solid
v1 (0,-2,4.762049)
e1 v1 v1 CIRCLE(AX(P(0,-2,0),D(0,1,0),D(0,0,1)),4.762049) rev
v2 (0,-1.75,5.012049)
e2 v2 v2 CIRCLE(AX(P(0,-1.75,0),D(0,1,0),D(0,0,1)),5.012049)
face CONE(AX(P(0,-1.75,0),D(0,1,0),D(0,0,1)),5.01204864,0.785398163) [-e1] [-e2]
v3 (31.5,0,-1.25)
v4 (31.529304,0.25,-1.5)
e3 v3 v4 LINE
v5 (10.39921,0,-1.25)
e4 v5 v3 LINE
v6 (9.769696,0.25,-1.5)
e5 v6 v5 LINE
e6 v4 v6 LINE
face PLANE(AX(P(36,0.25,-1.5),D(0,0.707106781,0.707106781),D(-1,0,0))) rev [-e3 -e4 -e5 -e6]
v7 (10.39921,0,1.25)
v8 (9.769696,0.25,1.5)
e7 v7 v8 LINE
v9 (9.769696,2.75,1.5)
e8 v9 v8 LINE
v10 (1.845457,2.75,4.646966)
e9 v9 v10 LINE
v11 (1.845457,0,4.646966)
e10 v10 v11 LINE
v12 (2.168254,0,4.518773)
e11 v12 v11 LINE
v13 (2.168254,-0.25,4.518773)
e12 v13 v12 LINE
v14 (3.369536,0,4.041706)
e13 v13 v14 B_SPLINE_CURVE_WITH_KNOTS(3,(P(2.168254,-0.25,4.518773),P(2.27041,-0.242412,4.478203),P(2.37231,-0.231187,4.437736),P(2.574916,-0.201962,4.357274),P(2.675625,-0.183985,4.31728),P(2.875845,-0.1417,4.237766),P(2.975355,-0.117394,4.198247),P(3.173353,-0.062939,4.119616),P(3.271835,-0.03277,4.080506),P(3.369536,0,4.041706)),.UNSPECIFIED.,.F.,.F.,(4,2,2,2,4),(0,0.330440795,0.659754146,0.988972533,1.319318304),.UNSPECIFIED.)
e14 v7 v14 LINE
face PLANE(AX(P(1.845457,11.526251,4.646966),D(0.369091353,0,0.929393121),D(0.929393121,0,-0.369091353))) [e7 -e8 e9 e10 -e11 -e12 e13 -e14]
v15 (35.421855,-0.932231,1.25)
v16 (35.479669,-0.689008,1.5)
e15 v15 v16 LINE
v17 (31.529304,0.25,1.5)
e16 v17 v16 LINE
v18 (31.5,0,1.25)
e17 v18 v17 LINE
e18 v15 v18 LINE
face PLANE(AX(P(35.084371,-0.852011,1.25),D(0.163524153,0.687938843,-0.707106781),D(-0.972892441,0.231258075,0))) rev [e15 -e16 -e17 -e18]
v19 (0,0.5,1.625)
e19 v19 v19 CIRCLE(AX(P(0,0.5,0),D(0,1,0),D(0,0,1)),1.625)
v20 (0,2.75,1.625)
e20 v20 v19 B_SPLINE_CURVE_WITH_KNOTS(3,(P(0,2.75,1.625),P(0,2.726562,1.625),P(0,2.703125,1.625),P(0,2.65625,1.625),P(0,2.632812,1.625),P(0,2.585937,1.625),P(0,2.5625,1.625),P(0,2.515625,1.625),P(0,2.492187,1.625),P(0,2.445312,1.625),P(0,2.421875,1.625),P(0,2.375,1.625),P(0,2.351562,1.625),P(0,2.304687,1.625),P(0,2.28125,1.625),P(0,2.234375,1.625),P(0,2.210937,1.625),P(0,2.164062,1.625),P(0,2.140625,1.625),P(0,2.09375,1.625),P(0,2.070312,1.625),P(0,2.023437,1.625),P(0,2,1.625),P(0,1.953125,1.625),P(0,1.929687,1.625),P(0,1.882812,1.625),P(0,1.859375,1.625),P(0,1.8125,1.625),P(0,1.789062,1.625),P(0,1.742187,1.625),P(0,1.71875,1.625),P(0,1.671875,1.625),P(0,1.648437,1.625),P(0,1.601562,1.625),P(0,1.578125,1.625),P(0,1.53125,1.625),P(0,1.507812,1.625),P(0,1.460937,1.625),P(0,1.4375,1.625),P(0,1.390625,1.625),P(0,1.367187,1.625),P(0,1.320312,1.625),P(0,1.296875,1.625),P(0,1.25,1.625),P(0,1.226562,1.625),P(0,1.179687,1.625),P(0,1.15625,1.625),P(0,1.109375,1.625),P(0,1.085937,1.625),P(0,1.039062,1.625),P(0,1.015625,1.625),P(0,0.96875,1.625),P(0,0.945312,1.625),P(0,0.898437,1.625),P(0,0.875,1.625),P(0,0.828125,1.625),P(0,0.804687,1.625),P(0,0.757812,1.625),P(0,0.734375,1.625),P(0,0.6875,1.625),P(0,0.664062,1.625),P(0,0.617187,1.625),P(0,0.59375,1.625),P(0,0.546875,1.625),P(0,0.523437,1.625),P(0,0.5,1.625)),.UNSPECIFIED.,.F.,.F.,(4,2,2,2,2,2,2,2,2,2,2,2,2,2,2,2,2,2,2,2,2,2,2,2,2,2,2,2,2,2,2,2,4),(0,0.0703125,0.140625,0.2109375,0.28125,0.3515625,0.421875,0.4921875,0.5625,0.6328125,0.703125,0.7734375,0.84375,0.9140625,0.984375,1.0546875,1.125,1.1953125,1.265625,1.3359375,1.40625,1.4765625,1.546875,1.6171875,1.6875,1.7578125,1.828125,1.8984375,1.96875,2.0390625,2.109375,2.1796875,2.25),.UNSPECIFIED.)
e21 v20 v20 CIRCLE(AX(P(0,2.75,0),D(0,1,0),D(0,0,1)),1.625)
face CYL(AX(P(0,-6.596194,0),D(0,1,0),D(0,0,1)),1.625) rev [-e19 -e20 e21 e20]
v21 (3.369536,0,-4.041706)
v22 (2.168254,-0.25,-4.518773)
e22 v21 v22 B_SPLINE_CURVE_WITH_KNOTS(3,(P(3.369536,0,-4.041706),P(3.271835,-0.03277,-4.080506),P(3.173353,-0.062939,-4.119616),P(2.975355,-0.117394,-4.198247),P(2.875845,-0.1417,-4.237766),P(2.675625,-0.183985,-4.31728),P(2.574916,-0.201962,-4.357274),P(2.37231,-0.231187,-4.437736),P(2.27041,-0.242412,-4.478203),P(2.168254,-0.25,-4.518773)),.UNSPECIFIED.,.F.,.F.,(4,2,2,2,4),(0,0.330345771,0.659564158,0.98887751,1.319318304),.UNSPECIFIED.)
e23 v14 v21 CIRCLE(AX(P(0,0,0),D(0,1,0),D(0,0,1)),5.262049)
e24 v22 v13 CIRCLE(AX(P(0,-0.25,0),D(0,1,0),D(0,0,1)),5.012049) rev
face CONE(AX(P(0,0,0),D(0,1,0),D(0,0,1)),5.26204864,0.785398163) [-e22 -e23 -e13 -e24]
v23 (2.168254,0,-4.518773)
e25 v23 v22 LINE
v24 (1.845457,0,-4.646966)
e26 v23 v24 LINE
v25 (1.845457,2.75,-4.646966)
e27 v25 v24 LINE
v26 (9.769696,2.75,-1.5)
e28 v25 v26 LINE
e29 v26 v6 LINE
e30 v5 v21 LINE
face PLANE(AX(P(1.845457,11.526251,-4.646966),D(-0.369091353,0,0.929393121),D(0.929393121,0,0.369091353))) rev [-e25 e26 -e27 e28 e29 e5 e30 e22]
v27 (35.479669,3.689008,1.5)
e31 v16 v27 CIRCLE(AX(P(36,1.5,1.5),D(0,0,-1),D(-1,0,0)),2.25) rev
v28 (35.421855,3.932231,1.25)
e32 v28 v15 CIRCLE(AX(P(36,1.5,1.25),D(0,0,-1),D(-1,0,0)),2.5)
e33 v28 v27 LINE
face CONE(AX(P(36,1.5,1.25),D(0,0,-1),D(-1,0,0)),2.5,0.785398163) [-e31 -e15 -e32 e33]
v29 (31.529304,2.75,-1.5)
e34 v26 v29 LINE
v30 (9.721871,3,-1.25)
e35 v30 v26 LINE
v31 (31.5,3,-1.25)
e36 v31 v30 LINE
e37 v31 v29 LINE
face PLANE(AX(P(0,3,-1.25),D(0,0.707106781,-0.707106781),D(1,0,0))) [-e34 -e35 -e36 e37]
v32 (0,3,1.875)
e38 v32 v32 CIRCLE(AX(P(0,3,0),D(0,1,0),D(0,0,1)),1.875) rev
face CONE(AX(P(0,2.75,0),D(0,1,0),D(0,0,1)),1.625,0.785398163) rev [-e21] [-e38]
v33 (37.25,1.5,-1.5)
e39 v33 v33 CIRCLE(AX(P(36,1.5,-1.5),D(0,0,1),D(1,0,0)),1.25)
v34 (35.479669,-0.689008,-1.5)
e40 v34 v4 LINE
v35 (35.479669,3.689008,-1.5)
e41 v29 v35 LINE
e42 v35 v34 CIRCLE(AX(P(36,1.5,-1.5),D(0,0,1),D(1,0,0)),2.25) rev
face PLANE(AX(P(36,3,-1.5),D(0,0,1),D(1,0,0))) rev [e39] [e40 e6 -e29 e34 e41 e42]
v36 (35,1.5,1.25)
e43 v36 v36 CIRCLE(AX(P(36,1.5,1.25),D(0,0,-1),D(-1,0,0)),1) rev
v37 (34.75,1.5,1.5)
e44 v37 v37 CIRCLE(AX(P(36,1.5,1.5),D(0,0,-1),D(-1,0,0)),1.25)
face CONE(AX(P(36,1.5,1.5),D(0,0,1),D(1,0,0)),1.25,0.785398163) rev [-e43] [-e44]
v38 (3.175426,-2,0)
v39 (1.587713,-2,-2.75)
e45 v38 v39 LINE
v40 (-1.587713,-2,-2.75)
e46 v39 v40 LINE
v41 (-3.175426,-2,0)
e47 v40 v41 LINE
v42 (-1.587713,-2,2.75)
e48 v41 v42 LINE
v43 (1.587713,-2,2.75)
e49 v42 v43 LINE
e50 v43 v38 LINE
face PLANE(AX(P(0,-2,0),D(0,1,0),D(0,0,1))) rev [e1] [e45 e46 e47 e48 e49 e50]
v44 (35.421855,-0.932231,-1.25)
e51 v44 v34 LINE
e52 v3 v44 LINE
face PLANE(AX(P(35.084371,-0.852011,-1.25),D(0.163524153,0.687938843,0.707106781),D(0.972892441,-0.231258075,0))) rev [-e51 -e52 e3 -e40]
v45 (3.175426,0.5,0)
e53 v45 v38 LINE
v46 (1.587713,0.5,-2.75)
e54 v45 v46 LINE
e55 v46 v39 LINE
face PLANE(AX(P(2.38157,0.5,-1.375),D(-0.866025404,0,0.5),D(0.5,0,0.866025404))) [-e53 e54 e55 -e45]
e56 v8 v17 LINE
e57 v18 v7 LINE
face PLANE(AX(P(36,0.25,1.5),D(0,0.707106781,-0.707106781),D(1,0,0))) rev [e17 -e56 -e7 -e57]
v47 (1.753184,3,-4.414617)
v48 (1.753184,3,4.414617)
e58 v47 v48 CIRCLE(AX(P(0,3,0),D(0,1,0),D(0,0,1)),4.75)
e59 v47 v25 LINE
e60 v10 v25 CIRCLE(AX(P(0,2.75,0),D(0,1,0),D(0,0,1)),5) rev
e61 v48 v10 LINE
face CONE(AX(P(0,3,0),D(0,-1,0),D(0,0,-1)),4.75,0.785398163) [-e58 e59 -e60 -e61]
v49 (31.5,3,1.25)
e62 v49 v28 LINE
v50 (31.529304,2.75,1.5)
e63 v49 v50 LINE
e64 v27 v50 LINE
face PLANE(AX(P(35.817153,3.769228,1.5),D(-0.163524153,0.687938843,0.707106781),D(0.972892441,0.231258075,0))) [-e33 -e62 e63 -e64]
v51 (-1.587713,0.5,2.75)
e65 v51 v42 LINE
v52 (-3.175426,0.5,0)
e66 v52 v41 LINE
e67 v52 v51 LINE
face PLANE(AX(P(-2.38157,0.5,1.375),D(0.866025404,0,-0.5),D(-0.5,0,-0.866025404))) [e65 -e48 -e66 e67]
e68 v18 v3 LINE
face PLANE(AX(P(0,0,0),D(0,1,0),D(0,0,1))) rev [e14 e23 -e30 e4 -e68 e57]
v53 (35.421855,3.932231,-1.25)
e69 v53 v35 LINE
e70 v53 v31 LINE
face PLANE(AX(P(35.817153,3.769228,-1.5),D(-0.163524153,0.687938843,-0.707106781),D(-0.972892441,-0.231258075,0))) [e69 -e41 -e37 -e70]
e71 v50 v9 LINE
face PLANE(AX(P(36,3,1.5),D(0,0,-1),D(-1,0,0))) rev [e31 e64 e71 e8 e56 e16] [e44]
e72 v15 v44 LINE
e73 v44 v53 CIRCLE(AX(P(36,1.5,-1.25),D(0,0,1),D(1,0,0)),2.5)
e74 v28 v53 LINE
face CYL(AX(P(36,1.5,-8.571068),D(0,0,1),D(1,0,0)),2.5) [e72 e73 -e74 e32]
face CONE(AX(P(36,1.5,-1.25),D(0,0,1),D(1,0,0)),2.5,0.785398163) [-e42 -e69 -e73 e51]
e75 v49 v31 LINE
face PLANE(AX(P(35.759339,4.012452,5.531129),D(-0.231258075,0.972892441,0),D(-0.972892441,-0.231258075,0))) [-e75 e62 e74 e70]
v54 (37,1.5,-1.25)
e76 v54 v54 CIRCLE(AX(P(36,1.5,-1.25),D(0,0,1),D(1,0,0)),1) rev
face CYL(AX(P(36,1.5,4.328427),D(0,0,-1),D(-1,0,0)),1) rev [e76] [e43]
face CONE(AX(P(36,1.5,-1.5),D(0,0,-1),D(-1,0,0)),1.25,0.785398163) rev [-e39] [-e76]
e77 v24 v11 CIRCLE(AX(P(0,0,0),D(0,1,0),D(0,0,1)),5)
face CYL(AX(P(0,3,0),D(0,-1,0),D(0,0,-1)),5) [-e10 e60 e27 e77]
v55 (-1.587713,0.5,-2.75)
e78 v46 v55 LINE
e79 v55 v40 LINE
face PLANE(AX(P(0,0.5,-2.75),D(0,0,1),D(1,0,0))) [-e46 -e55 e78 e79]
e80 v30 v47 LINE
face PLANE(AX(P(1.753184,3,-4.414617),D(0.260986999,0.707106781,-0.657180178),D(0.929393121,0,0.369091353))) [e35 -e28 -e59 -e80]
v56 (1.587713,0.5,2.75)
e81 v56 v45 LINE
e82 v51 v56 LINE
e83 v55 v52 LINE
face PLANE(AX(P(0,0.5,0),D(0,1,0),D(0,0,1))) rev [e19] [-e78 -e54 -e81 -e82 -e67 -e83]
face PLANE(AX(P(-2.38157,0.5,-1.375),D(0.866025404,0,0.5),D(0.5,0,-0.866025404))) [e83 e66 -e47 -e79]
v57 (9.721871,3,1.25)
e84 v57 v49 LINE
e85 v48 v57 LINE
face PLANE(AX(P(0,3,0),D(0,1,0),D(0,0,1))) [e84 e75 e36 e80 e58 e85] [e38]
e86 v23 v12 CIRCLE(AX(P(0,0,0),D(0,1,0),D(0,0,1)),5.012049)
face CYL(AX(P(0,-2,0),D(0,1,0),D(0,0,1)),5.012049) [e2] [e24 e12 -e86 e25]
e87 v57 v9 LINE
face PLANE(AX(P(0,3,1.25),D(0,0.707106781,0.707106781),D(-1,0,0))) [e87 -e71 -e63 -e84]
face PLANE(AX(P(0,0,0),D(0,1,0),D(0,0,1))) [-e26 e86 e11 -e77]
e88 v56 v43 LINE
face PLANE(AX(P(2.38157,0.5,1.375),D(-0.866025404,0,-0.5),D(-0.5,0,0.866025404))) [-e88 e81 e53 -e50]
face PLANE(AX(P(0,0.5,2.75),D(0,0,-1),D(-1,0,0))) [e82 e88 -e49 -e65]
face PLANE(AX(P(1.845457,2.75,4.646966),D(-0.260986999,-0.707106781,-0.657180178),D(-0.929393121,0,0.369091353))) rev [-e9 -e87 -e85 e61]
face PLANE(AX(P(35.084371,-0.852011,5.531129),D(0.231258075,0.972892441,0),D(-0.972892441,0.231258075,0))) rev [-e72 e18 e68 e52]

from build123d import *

# Parameters (mm, degrees)
EXTRUDE_1_DEPTH     = 3
EXTRUDE_START       = 1.5
SKETCH_2_R          = 2.5
EXTRUDE_2_DEPTH     = 3
CUT_EXTRUDE_START   = -1.5
SKETCH_3_R          = 1
CUT_EXTRUDE_1_DEPTH = 3
EXTRUDE_3_DEPTH     = 3
EXTRUDE_4_DEPTH     = 3
SKETCH_7_R          = 5.01204864
EXTRUDE_5_DEPTH     = 2
CUT_EXTRUDE_START_2 = -2
CUT_EXTRUDE_2_DEPTH = 2.5
CUT_EXTRUDE_START_3 = 3
SKETCH_9_R          = 1.625
CUT_EXTRUDE_3_DEPTH = 5
CHAMFER_3_SIZE      = 0.25


with BuildPart() as part:
    # 草图1 → 凸台-拉伸1 (new body)
    with BuildSketch(Plane(origin=(0, 0, 0), x_dir=(1, 0, 0), z_dir=(0, 1, 0))):
        with BuildLine():
            Line((36, -1.5), (36, 1.5))
            Line((36, 1.5), (4.769696007, 1.5))
            ThreePointArc((4.769696007, 1.5), (-5, 0), (4.769696007, -1.5))
            Line((4.769696007, -1.5), (36, -1.5))
        make_face()
    extrude(amount=EXTRUDE_1_DEPTH)

    # 草图2 → 凸台-拉伸2 (add)
    with BuildSketch(Plane.XY.offset(EXTRUDE_START)):
        with Locations((36, 1.5)):
            Circle(SKETCH_2_R)
    extrude(amount=-EXTRUDE_2_DEPTH)

    # 草图3 → 切除-拉伸1 (cut)
    with BuildSketch(Plane.XY.offset(CUT_EXTRUDE_START)):
        with Locations(Location((36, 1.5, 0), (0, 0, 180))):
            Circle(SKETCH_3_R)
    extrude(amount=CUT_EXTRUDE_1_DEPTH, mode=Mode.SUBTRACT)

    # 草图5 → 凸台-拉伸3 (add)
    with BuildSketch(Plane.XY.offset(EXTRUDE_START)):
        with BuildLine():
            ThreePointArc((35.421854812, 3.932231104), (34.629244055, 3.590700395), (34, 3))
            Line((34, 3), (31.5, 3))
            Line((31.5, 3), (35.421854812, 3.932231104))
        make_face()
        with BuildLine():
            ThreePointArc((34, 0), (34.629244055, -0.590700395), (35.421854812, -0.932231104))
            Line((35.421854812, -0.932231104), (31.5, 0))
            Line((31.5, 0), (34, 0))
        make_face()
    extrude(amount=-EXTRUDE_3_DEPTH)

    # 草图6 → 凸台-拉伸4 (add)
    with BuildSketch(Plane(origin=(0, 0, 0), x_dir=(1, 0, 0), z_dir=(0, 1, 0))):
        with BuildLine():
            ThreePointArc((4.769696007, 1.5), (3.662773496, 3.40354085), (1.845456766, 4.646965604))
            Line((1.845456766, 4.646965604), (9.769696007, 1.5))
            Line((9.769696007, 1.5), (4.769696007, 1.5))
        make_face()
        with BuildLine():
            ThreePointArc((1.845456766, -4.646965604), (3.662773496, -3.40354085), (4.769696007, -1.5))
            Line((4.769696007, -1.5), (9.769696007, -1.5))
            Line((9.769696007, -1.5), (1.845456766, -4.646965604))
        make_face()
    extrude(amount=EXTRUDE_4_DEPTH)

    # 草图7 → 凸台-拉伸5 (add)
    with BuildSketch(Plane(origin=(0, 0, 0), x_dir=(1, 0, 0), z_dir=(0, 1, 0))):
        with Locations(Location((0, 0, 0), (0, 0, 270))):
            Circle(SKETCH_7_R)
    extrude(amount=-EXTRUDE_5_DEPTH)

    # 草图8 → 切除-拉伸2 (cut)
    with BuildSketch(Plane(origin=(0, 0, 0), x_dir=(1, 0, 0), z_dir=(0, 1, 0)).offset(CUT_EXTRUDE_START_2)):
        Polygon((3.175426481, 0), (1.58771324, 2.75), (-1.58771324, 2.75), (-3.175426481, 0), (-1.58771324, -2.75), (1.58771324, -2.75), align=None)
    extrude(amount=CUT_EXTRUDE_2_DEPTH, mode=Mode.SUBTRACT)

    # 草图9 → 切除-拉伸3 (cut)
    with BuildSketch(Plane(origin=(0, 0, 0), x_dir=(1, 0, 0), z_dir=(0, 1, 0)).offset(CUT_EXTRUDE_START_3)):
        with Locations(Location((0, 0, 0), (0, 0, 270))):
            Circle(SKETCH_9_R)
    extrude(amount=-CUT_EXTRUDE_3_DEPTH, mode=Mode.SUBTRACT)

    # 倒角3
    # the kernel refuses this chamfer: 0.25 mm, written as the material it adds along each edge
    with BuildSketch(Plane(origin=(0, 0, 0), x_dir=(0.31362035772557234, 0, 0.949548456488706), z_dir=(-0.949548456488706, 0, 0.31362035772557234))) as chamfer_3_piece_1_section:
        Polygon((5.01204864 + CHAMFER_3_SIZE, 0), (5.01204864, -CHAMFER_3_SIZE), (5.01204864, 0), align=None)
    chamfer_3_piece_1 = revolve(axis=Axis((0, 0, 0), (0, 1, 0)), revolution_arc=143.444907743, mode=Mode.PRIVATE)
    chamfer_3_piece_1 = split(chamfer_3_piece_1, bisect_by=Plane(origin=(1.845456766, 0, 4.646965604), z_dir=(-0.3690913531117439, 0, -0.929393120836464)), keep=Keep.TOP, mode=Mode.PRIVATE)
    chamfer_3_piece_1 = split(chamfer_3_piece_1, bisect_by=Plane(origin=(1.845456766, 0, -4.646965604), z_dir=(-0.3690913531117441, 0, 0.9293931208364639)), keep=Keep.TOP, mode=Mode.PRIVATE)
    add(chamfer_3_piece_1)
    # the kernel refuses this chamfer: 0.25 mm, written as the material it takes off along each edge
    with BuildSketch(Plane(origin=(0, 3, 0), x_dir=(0, 0, 1), z_dir=(-1, 0, 0))) as chamfer_3_2_piece_1:
        Polygon((1.625 + CHAMFER_3_SIZE, 0), (1.625, -CHAMFER_3_SIZE), (1.625, 0), align=None)
    revolve(axis=Axis((0, 3, 0), (0, 1, 0)), mode=Mode.SUBTRACT)
    with BuildSketch(Plane(origin=(36, 1.5, 1.5), x_dir=(-1, 0, 0), z_dir=(0, 1, 0))) as chamfer_3_2_piece_2:
        Polygon((1 + CHAMFER_3_SIZE, 0), (1, -CHAMFER_3_SIZE), (1, 0), align=None)
    revolve(axis=Axis((36, 1.5, 1.5), (0, 0, 1)), mode=Mode.SUBTRACT)
    with BuildSketch(Plane(origin=(36, 1.5, -1.5), x_dir=(-1, 0, 0), z_dir=(0, 1, 0))) as chamfer_3_2_piece_3:
        Polygon((1, CHAMFER_3_SIZE), (1 + CHAMFER_3_SIZE, 0), (1, 0), align=None)
    revolve(axis=Axis((36, 1.5, -1.5), (0, 0, 1)), mode=Mode.SUBTRACT)
    with BuildSketch(Plane(origin=(36, 1.5, 1.5), x_dir=(-0.23125807505671483, -0.9728924414965218, 0), z_dir=(-0.9728924414965218, 0.23125807505671483, 0))) as chamfer_3_2_piece_4:
        Polygon((2.5 - CHAMFER_3_SIZE, 0), (2.5, -CHAMFER_3_SIZE), (2.5, 0), align=None)
    revolve(axis=Axis((36, 1.5, 1.5), (0, 0, 1)), revolution_arc=206.742302393, mode=Mode.SUBTRACT)
    with BuildSketch(Plane(origin=(32.142920747, 3, -1.5), x_dir=(0, 0, 1), z_dir=(-1, 0, 0))) as chamfer_3_2_piece_5_section:
        Polygon((CHAMFER_3_SIZE, 0), (0, -CHAMFER_3_SIZE), (0, 0), align=None)
    chamfer_3_2_piece_5 = extrude(amount=23.016145487, mode=Mode.PRIVATE)
    chamfer_3_2_piece_5 = split(chamfer_3_2_piece_5, bisect_by=Plane(origin=(32.15463621, 2.950713568, -1.449340307), z_dir=(-0.16352415307675153, 0.6879388427473303, -0.7071067811865444)), keep=Keep.TOP, mode=Mode.PRIVATE)
    chamfer_3_2_piece_5 = split(chamfer_3_2_piece_5, bisect_by=Plane(origin=(30.572849722, -1.253881896, 2.453528571), z_dir=(0.26098699866263353, 0.7071067811865455, -0.6571801781315938)), keep=Keep.TOP, mode=Mode.PRIVATE)
    add(chamfer_3_2_piece_5, mode=Mode.SUBTRACT)
    with BuildSketch(Plane(origin=(30.874507265, 2.851319386, -1.5), x_dir=(0, 0, 1), z_dir=(0.9728924414965218, 0.231258075056715, 0))) as chamfer_3_2_piece_6_section:
        Polygon((CHAMFER_3_SIZE, 0), (0, CHAMFER_3_SIZE), (0, 0), align=None)
    chamfer_3_2_piece_6 = extrude(amount=4.674049621, mode=Mode.PRIVATE)
    chamfer_3_2_piece_6 = split(chamfer_3_2_piece_6, bisect_by=Plane(origin=(30.874507265, 2.800659693, -1.449340307), z_dir=(0, 0.7071067811865476, -0.7071067811865476)), keep=Keep.TOP, mode=Mode.PRIVATE)
    add(chamfer_3_2_piece_6, mode=Mode.SUBTRACT)
    with BuildSketch(Plane(origin=(30.874507265, 2.851319386, 1.5), x_dir=(0.23125807505671495, -0.9728924414965217, 0), z_dir=(0.9728924414965218, 0.231258075056715, 0))) as chamfer_3_2_piece_7_section:
        Polygon((CHAMFER_3_SIZE, 0), (0, CHAMFER_3_SIZE), (0, 0), align=None)
    chamfer_3_2_piece_7 = extrude(amount=4.674049621, mode=Mode.PRIVATE)
    chamfer_3_2_piece_7 = split(chamfer_3_2_piece_7, bisect_by=Plane(origin=(30.874507265, 2.800659693, 1.449340307), z_dir=(0, 0.7071067811865476, 0.7071067811865476)), keep=Keep.TOP, mode=Mode.PRIVATE)
    add(chamfer_3_2_piece_7, mode=Mode.SUBTRACT)
    with BuildSketch(Plane(origin=(36, 1.5, -1.5), x_dir=(-0.23125807505671483, 0.9728924414965218, 0), z_dir=(-0.9728924414965218, -0.23125807505671483, 0))) as chamfer_3_2_piece_8:
        Polygon((2.5, -CHAMFER_3_SIZE), (2.5 - CHAMFER_3_SIZE, 0), (2.5, 0), align=None)
    revolve(axis=Axis((36, 1.5, -1.5), (0, 0, -1)), revolution_arc=206.742302393, mode=Mode.SUBTRACT)
    with BuildSketch(Plane(origin=(32.142920747, 0, -1.5), x_dir=(0, 0, 1), z_dir=(-1, 0, 0))) as chamfer_3_2_piece_9_section:
        Polygon((CHAMFER_3_SIZE, 0), (0, CHAMFER_3_SIZE), (0, 0), align=None)
    chamfer_3_2_piece_9 = extrude(amount=23.016145487, mode=Mode.PRIVATE)
    chamfer_3_2_piece_9 = split(chamfer_3_2_piece_9, bisect_by=Plane(origin=(29.095051535, 0, 6.174708862), z_dir=(0.3690913531117441, 0, -0.9293931208364639)), keep=Keep.TOP, mode=Mode.PRIVATE)
    chamfer_3_2_piece_9 = split(chamfer_3_2_piece_9, bisect_by=Plane(origin=(32.15463621, 0.049286432, -1.449340307), z_dir=(-0.16352415307675064, -0.6879388427473256, -0.7071067811865488)), keep=Keep.TOP, mode=Mode.PRIVATE)
    add(chamfer_3_2_piece_9, mode=Mode.SUBTRACT)
    with BuildSketch(Plane(origin=(35.421854812, -0.932231104, 1.5), x_dir=(0.23125807505671522, 0.9728924414965215, 0), z_dir=(-0.9728924414965217, 0.23125807505671525, 0))) as chamfer_3_2_piece_10_section:
        Polygon((CHAMFER_3_SIZE, 0), (0, CHAMFER_3_SIZE), (0, 0), align=None)
    chamfer_3_2_piece_10 = extrude(amount=4.674049621, mode=Mode.PRIVATE)
    chamfer_3_2_piece_10 = split(chamfer_3_2_piece_10, bisect_by=Plane(origin=(35.421854812, -0.341115552, 0.908884448), z_dir=(0, -0.7071067811865476, 0.7071067811865476)), keep=Keep.TOP, mode=Mode.PRIVATE)
    add(chamfer_3_2_piece_10, mode=Mode.SUBTRACT)
    with BuildSketch(Plane(origin=(35.421854812, -0.932231104, -1.5), x_dir=(0, 0, 1), z_dir=(-0.9728924414965217, 0.23125807505671525, 0))) as chamfer_3_2_piece_11_section:
        Polygon((CHAMFER_3_SIZE, 0), (0, CHAMFER_3_SIZE), (0, 0), align=None)
    chamfer_3_2_piece_11 = extrude(amount=4.674049621, mode=Mode.PRIVATE)
    chamfer_3_2_piece_11 = split(chamfer_3_2_piece_11, bisect_by=Plane(origin=(35.421854812, -0.341115552, -0.908884448), z_dir=(0, -0.7071067811865476, -0.7071067811865476)), keep=Keep.TOP, mode=Mode.PRIVATE)
    add(chamfer_3_2_piece_11, mode=Mode.SUBTRACT)
    with BuildSketch(Plane(origin=(0, 3, 0), x_dir=(0.36909135311174435, 0, -0.9293931208364636), z_dir=(0.9293931208364636, 0, 0.36909135311174435))) as chamfer_3_2_piece_12:
        Polygon((5 - CHAMFER_3_SIZE, 0), (5, -CHAMFER_3_SIZE), (5, 0), align=None)
    revolve(axis=Axis((0, 3, 0), (0, 1, 0)), revolution_arc=223.319179184, mode=Mode.SUBTRACT)
    with BuildSketch(Plane(origin=(1.845456766, 3, -4.646965604), x_dir=(-0.3690913531117441, 0, 0.9293931208364639), z_dir=(0.9293931208364639, 0, 0.3690913531117441))) as chamfer_3_2_piece_13_section:
        Polygon((CHAMFER_3_SIZE, 0), (0, CHAMFER_3_SIZE), (0, 0), align=None)
    chamfer_3_2_piece_13 = extrude(amount=9.169171979, mode=Mode.PRIVATE)
    chamfer_3_2_piece_13 = split(chamfer_3_2_piece_13, bisect_by=Plane(origin=(1.845456766, 1.301517198, -2.948482802), z_dir=(0, 0.7071067811865476, -0.7071067811865476)), keep=Keep.TOP, mode=Mode.PRIVATE)
    add(chamfer_3_2_piece_13, mode=Mode.SUBTRACT)
    with BuildSketch(Plane(origin=(9.12677526, 0, 1.5), x_dir=(0, 1, 0), z_dir=(1, 0, 0))) as chamfer_3_2_piece_14_section:
        Polygon((CHAMFER_3_SIZE, 0), (0, -CHAMFER_3_SIZE), (0, 0), align=None)
    chamfer_3_2_piece_14 = extrude(amount=23.016145487, mode=Mode.PRIVATE)
    chamfer_3_2_piece_14 = split(chamfer_3_2_piece_14, bisect_by=Plane(origin=(9.214359342, 0, 1.720541724), z_dir=(0.3690913531117439, 0, 0.929393120836464)), keep=Keep.TOP, mode=Mode.PRIVATE)
    chamfer_3_2_piece_14 = split(chamfer_3_2_piece_14, bisect_by=Plane(origin=(9.753945875, 2.638478895, -1.211994443), z_dir=(-0.16352415307675064, -0.6879388427473256, 0.7071067811865488)), keep=Keep.TOP, mode=Mode.PRIVATE)
    add(chamfer_3_2_piece_14, mode=Mode.SUBTRACT)
    with BuildSketch(Plane(origin=(9.12677526, 3, 1.5), x_dir=(0, -1, 0), z_dir=(1, 0, 0))) as chamfer_3_2_piece_15_section:
        Polygon((CHAMFER_3_SIZE, 0), (0, CHAMFER_3_SIZE), (0, 0), align=None)
    chamfer_3_2_piece_15 = extrude(amount=23.016145487, mode=Mode.PRIVATE)
    chamfer_3_2_piece_15 = split(chamfer_3_2_piece_15, bisect_by=Plane(origin=(9.753945875, 0.361521105, -1.211994443), z_dir=(-0.16352415307675153, 0.6879388427473303, 0.7071067811865444)), keep=Keep.TOP, mode=Mode.PRIVATE)
    chamfer_3_2_piece_15 = split(chamfer_3_2_piece_15, bisect_by=Plane(origin=(9.124430882, 2.993648244, 1.494096722), z_dir=(0.2609869986626325, 0.7071067811865481, 0.6571801781315915)), keep=Keep.TOP, mode=Mode.PRIVATE)
    add(chamfer_3_2_piece_15, mode=Mode.SUBTRACT)
    with BuildSketch(Plane(origin=(10.367222127, 3, 1.262703512), x_dir=(-0.3690913531117439, 0, -0.929393120836464), z_dir=(-0.9293931208364639, 0, 0.36909135311174385))) as chamfer_3_2_piece_16_section:
        Polygon((CHAMFER_3_SIZE, 0), (0, CHAMFER_3_SIZE), (0, 0), align=None)
    chamfer_3_2_piece_16 = extrude(amount=9.169171979, mode=Mode.PRIVATE)
    chamfer_3_2_piece_16 = split(chamfer_3_2_piece_16, bisect_by=Plane(origin=(10.367222127, 2.993648244, 1.256351756), z_dir=(0, 0.7071067811865476, 0.7071067811865476)), keep=Keep.TOP, mode=Mode.PRIVATE)
    add(chamfer_3_2_piece_16, mode=Mode.SUBTRACT)
    with BuildSketch(Plane(origin=(0, -2, 0), x_dir=(0, 0, 1), z_dir=(-1, 0, 0))) as chamfer_3_2_piece_17:
        Polygon((5.01204864, CHAMFER_3_SIZE), (5.01204864 - CHAMFER_3_SIZE, 0), (5.01204864, 0), align=None)
    revolve(axis=Axis((0, -2, 0), (0, 1, 0)), mode=Mode.SUBTRACT)


solid = part.part
